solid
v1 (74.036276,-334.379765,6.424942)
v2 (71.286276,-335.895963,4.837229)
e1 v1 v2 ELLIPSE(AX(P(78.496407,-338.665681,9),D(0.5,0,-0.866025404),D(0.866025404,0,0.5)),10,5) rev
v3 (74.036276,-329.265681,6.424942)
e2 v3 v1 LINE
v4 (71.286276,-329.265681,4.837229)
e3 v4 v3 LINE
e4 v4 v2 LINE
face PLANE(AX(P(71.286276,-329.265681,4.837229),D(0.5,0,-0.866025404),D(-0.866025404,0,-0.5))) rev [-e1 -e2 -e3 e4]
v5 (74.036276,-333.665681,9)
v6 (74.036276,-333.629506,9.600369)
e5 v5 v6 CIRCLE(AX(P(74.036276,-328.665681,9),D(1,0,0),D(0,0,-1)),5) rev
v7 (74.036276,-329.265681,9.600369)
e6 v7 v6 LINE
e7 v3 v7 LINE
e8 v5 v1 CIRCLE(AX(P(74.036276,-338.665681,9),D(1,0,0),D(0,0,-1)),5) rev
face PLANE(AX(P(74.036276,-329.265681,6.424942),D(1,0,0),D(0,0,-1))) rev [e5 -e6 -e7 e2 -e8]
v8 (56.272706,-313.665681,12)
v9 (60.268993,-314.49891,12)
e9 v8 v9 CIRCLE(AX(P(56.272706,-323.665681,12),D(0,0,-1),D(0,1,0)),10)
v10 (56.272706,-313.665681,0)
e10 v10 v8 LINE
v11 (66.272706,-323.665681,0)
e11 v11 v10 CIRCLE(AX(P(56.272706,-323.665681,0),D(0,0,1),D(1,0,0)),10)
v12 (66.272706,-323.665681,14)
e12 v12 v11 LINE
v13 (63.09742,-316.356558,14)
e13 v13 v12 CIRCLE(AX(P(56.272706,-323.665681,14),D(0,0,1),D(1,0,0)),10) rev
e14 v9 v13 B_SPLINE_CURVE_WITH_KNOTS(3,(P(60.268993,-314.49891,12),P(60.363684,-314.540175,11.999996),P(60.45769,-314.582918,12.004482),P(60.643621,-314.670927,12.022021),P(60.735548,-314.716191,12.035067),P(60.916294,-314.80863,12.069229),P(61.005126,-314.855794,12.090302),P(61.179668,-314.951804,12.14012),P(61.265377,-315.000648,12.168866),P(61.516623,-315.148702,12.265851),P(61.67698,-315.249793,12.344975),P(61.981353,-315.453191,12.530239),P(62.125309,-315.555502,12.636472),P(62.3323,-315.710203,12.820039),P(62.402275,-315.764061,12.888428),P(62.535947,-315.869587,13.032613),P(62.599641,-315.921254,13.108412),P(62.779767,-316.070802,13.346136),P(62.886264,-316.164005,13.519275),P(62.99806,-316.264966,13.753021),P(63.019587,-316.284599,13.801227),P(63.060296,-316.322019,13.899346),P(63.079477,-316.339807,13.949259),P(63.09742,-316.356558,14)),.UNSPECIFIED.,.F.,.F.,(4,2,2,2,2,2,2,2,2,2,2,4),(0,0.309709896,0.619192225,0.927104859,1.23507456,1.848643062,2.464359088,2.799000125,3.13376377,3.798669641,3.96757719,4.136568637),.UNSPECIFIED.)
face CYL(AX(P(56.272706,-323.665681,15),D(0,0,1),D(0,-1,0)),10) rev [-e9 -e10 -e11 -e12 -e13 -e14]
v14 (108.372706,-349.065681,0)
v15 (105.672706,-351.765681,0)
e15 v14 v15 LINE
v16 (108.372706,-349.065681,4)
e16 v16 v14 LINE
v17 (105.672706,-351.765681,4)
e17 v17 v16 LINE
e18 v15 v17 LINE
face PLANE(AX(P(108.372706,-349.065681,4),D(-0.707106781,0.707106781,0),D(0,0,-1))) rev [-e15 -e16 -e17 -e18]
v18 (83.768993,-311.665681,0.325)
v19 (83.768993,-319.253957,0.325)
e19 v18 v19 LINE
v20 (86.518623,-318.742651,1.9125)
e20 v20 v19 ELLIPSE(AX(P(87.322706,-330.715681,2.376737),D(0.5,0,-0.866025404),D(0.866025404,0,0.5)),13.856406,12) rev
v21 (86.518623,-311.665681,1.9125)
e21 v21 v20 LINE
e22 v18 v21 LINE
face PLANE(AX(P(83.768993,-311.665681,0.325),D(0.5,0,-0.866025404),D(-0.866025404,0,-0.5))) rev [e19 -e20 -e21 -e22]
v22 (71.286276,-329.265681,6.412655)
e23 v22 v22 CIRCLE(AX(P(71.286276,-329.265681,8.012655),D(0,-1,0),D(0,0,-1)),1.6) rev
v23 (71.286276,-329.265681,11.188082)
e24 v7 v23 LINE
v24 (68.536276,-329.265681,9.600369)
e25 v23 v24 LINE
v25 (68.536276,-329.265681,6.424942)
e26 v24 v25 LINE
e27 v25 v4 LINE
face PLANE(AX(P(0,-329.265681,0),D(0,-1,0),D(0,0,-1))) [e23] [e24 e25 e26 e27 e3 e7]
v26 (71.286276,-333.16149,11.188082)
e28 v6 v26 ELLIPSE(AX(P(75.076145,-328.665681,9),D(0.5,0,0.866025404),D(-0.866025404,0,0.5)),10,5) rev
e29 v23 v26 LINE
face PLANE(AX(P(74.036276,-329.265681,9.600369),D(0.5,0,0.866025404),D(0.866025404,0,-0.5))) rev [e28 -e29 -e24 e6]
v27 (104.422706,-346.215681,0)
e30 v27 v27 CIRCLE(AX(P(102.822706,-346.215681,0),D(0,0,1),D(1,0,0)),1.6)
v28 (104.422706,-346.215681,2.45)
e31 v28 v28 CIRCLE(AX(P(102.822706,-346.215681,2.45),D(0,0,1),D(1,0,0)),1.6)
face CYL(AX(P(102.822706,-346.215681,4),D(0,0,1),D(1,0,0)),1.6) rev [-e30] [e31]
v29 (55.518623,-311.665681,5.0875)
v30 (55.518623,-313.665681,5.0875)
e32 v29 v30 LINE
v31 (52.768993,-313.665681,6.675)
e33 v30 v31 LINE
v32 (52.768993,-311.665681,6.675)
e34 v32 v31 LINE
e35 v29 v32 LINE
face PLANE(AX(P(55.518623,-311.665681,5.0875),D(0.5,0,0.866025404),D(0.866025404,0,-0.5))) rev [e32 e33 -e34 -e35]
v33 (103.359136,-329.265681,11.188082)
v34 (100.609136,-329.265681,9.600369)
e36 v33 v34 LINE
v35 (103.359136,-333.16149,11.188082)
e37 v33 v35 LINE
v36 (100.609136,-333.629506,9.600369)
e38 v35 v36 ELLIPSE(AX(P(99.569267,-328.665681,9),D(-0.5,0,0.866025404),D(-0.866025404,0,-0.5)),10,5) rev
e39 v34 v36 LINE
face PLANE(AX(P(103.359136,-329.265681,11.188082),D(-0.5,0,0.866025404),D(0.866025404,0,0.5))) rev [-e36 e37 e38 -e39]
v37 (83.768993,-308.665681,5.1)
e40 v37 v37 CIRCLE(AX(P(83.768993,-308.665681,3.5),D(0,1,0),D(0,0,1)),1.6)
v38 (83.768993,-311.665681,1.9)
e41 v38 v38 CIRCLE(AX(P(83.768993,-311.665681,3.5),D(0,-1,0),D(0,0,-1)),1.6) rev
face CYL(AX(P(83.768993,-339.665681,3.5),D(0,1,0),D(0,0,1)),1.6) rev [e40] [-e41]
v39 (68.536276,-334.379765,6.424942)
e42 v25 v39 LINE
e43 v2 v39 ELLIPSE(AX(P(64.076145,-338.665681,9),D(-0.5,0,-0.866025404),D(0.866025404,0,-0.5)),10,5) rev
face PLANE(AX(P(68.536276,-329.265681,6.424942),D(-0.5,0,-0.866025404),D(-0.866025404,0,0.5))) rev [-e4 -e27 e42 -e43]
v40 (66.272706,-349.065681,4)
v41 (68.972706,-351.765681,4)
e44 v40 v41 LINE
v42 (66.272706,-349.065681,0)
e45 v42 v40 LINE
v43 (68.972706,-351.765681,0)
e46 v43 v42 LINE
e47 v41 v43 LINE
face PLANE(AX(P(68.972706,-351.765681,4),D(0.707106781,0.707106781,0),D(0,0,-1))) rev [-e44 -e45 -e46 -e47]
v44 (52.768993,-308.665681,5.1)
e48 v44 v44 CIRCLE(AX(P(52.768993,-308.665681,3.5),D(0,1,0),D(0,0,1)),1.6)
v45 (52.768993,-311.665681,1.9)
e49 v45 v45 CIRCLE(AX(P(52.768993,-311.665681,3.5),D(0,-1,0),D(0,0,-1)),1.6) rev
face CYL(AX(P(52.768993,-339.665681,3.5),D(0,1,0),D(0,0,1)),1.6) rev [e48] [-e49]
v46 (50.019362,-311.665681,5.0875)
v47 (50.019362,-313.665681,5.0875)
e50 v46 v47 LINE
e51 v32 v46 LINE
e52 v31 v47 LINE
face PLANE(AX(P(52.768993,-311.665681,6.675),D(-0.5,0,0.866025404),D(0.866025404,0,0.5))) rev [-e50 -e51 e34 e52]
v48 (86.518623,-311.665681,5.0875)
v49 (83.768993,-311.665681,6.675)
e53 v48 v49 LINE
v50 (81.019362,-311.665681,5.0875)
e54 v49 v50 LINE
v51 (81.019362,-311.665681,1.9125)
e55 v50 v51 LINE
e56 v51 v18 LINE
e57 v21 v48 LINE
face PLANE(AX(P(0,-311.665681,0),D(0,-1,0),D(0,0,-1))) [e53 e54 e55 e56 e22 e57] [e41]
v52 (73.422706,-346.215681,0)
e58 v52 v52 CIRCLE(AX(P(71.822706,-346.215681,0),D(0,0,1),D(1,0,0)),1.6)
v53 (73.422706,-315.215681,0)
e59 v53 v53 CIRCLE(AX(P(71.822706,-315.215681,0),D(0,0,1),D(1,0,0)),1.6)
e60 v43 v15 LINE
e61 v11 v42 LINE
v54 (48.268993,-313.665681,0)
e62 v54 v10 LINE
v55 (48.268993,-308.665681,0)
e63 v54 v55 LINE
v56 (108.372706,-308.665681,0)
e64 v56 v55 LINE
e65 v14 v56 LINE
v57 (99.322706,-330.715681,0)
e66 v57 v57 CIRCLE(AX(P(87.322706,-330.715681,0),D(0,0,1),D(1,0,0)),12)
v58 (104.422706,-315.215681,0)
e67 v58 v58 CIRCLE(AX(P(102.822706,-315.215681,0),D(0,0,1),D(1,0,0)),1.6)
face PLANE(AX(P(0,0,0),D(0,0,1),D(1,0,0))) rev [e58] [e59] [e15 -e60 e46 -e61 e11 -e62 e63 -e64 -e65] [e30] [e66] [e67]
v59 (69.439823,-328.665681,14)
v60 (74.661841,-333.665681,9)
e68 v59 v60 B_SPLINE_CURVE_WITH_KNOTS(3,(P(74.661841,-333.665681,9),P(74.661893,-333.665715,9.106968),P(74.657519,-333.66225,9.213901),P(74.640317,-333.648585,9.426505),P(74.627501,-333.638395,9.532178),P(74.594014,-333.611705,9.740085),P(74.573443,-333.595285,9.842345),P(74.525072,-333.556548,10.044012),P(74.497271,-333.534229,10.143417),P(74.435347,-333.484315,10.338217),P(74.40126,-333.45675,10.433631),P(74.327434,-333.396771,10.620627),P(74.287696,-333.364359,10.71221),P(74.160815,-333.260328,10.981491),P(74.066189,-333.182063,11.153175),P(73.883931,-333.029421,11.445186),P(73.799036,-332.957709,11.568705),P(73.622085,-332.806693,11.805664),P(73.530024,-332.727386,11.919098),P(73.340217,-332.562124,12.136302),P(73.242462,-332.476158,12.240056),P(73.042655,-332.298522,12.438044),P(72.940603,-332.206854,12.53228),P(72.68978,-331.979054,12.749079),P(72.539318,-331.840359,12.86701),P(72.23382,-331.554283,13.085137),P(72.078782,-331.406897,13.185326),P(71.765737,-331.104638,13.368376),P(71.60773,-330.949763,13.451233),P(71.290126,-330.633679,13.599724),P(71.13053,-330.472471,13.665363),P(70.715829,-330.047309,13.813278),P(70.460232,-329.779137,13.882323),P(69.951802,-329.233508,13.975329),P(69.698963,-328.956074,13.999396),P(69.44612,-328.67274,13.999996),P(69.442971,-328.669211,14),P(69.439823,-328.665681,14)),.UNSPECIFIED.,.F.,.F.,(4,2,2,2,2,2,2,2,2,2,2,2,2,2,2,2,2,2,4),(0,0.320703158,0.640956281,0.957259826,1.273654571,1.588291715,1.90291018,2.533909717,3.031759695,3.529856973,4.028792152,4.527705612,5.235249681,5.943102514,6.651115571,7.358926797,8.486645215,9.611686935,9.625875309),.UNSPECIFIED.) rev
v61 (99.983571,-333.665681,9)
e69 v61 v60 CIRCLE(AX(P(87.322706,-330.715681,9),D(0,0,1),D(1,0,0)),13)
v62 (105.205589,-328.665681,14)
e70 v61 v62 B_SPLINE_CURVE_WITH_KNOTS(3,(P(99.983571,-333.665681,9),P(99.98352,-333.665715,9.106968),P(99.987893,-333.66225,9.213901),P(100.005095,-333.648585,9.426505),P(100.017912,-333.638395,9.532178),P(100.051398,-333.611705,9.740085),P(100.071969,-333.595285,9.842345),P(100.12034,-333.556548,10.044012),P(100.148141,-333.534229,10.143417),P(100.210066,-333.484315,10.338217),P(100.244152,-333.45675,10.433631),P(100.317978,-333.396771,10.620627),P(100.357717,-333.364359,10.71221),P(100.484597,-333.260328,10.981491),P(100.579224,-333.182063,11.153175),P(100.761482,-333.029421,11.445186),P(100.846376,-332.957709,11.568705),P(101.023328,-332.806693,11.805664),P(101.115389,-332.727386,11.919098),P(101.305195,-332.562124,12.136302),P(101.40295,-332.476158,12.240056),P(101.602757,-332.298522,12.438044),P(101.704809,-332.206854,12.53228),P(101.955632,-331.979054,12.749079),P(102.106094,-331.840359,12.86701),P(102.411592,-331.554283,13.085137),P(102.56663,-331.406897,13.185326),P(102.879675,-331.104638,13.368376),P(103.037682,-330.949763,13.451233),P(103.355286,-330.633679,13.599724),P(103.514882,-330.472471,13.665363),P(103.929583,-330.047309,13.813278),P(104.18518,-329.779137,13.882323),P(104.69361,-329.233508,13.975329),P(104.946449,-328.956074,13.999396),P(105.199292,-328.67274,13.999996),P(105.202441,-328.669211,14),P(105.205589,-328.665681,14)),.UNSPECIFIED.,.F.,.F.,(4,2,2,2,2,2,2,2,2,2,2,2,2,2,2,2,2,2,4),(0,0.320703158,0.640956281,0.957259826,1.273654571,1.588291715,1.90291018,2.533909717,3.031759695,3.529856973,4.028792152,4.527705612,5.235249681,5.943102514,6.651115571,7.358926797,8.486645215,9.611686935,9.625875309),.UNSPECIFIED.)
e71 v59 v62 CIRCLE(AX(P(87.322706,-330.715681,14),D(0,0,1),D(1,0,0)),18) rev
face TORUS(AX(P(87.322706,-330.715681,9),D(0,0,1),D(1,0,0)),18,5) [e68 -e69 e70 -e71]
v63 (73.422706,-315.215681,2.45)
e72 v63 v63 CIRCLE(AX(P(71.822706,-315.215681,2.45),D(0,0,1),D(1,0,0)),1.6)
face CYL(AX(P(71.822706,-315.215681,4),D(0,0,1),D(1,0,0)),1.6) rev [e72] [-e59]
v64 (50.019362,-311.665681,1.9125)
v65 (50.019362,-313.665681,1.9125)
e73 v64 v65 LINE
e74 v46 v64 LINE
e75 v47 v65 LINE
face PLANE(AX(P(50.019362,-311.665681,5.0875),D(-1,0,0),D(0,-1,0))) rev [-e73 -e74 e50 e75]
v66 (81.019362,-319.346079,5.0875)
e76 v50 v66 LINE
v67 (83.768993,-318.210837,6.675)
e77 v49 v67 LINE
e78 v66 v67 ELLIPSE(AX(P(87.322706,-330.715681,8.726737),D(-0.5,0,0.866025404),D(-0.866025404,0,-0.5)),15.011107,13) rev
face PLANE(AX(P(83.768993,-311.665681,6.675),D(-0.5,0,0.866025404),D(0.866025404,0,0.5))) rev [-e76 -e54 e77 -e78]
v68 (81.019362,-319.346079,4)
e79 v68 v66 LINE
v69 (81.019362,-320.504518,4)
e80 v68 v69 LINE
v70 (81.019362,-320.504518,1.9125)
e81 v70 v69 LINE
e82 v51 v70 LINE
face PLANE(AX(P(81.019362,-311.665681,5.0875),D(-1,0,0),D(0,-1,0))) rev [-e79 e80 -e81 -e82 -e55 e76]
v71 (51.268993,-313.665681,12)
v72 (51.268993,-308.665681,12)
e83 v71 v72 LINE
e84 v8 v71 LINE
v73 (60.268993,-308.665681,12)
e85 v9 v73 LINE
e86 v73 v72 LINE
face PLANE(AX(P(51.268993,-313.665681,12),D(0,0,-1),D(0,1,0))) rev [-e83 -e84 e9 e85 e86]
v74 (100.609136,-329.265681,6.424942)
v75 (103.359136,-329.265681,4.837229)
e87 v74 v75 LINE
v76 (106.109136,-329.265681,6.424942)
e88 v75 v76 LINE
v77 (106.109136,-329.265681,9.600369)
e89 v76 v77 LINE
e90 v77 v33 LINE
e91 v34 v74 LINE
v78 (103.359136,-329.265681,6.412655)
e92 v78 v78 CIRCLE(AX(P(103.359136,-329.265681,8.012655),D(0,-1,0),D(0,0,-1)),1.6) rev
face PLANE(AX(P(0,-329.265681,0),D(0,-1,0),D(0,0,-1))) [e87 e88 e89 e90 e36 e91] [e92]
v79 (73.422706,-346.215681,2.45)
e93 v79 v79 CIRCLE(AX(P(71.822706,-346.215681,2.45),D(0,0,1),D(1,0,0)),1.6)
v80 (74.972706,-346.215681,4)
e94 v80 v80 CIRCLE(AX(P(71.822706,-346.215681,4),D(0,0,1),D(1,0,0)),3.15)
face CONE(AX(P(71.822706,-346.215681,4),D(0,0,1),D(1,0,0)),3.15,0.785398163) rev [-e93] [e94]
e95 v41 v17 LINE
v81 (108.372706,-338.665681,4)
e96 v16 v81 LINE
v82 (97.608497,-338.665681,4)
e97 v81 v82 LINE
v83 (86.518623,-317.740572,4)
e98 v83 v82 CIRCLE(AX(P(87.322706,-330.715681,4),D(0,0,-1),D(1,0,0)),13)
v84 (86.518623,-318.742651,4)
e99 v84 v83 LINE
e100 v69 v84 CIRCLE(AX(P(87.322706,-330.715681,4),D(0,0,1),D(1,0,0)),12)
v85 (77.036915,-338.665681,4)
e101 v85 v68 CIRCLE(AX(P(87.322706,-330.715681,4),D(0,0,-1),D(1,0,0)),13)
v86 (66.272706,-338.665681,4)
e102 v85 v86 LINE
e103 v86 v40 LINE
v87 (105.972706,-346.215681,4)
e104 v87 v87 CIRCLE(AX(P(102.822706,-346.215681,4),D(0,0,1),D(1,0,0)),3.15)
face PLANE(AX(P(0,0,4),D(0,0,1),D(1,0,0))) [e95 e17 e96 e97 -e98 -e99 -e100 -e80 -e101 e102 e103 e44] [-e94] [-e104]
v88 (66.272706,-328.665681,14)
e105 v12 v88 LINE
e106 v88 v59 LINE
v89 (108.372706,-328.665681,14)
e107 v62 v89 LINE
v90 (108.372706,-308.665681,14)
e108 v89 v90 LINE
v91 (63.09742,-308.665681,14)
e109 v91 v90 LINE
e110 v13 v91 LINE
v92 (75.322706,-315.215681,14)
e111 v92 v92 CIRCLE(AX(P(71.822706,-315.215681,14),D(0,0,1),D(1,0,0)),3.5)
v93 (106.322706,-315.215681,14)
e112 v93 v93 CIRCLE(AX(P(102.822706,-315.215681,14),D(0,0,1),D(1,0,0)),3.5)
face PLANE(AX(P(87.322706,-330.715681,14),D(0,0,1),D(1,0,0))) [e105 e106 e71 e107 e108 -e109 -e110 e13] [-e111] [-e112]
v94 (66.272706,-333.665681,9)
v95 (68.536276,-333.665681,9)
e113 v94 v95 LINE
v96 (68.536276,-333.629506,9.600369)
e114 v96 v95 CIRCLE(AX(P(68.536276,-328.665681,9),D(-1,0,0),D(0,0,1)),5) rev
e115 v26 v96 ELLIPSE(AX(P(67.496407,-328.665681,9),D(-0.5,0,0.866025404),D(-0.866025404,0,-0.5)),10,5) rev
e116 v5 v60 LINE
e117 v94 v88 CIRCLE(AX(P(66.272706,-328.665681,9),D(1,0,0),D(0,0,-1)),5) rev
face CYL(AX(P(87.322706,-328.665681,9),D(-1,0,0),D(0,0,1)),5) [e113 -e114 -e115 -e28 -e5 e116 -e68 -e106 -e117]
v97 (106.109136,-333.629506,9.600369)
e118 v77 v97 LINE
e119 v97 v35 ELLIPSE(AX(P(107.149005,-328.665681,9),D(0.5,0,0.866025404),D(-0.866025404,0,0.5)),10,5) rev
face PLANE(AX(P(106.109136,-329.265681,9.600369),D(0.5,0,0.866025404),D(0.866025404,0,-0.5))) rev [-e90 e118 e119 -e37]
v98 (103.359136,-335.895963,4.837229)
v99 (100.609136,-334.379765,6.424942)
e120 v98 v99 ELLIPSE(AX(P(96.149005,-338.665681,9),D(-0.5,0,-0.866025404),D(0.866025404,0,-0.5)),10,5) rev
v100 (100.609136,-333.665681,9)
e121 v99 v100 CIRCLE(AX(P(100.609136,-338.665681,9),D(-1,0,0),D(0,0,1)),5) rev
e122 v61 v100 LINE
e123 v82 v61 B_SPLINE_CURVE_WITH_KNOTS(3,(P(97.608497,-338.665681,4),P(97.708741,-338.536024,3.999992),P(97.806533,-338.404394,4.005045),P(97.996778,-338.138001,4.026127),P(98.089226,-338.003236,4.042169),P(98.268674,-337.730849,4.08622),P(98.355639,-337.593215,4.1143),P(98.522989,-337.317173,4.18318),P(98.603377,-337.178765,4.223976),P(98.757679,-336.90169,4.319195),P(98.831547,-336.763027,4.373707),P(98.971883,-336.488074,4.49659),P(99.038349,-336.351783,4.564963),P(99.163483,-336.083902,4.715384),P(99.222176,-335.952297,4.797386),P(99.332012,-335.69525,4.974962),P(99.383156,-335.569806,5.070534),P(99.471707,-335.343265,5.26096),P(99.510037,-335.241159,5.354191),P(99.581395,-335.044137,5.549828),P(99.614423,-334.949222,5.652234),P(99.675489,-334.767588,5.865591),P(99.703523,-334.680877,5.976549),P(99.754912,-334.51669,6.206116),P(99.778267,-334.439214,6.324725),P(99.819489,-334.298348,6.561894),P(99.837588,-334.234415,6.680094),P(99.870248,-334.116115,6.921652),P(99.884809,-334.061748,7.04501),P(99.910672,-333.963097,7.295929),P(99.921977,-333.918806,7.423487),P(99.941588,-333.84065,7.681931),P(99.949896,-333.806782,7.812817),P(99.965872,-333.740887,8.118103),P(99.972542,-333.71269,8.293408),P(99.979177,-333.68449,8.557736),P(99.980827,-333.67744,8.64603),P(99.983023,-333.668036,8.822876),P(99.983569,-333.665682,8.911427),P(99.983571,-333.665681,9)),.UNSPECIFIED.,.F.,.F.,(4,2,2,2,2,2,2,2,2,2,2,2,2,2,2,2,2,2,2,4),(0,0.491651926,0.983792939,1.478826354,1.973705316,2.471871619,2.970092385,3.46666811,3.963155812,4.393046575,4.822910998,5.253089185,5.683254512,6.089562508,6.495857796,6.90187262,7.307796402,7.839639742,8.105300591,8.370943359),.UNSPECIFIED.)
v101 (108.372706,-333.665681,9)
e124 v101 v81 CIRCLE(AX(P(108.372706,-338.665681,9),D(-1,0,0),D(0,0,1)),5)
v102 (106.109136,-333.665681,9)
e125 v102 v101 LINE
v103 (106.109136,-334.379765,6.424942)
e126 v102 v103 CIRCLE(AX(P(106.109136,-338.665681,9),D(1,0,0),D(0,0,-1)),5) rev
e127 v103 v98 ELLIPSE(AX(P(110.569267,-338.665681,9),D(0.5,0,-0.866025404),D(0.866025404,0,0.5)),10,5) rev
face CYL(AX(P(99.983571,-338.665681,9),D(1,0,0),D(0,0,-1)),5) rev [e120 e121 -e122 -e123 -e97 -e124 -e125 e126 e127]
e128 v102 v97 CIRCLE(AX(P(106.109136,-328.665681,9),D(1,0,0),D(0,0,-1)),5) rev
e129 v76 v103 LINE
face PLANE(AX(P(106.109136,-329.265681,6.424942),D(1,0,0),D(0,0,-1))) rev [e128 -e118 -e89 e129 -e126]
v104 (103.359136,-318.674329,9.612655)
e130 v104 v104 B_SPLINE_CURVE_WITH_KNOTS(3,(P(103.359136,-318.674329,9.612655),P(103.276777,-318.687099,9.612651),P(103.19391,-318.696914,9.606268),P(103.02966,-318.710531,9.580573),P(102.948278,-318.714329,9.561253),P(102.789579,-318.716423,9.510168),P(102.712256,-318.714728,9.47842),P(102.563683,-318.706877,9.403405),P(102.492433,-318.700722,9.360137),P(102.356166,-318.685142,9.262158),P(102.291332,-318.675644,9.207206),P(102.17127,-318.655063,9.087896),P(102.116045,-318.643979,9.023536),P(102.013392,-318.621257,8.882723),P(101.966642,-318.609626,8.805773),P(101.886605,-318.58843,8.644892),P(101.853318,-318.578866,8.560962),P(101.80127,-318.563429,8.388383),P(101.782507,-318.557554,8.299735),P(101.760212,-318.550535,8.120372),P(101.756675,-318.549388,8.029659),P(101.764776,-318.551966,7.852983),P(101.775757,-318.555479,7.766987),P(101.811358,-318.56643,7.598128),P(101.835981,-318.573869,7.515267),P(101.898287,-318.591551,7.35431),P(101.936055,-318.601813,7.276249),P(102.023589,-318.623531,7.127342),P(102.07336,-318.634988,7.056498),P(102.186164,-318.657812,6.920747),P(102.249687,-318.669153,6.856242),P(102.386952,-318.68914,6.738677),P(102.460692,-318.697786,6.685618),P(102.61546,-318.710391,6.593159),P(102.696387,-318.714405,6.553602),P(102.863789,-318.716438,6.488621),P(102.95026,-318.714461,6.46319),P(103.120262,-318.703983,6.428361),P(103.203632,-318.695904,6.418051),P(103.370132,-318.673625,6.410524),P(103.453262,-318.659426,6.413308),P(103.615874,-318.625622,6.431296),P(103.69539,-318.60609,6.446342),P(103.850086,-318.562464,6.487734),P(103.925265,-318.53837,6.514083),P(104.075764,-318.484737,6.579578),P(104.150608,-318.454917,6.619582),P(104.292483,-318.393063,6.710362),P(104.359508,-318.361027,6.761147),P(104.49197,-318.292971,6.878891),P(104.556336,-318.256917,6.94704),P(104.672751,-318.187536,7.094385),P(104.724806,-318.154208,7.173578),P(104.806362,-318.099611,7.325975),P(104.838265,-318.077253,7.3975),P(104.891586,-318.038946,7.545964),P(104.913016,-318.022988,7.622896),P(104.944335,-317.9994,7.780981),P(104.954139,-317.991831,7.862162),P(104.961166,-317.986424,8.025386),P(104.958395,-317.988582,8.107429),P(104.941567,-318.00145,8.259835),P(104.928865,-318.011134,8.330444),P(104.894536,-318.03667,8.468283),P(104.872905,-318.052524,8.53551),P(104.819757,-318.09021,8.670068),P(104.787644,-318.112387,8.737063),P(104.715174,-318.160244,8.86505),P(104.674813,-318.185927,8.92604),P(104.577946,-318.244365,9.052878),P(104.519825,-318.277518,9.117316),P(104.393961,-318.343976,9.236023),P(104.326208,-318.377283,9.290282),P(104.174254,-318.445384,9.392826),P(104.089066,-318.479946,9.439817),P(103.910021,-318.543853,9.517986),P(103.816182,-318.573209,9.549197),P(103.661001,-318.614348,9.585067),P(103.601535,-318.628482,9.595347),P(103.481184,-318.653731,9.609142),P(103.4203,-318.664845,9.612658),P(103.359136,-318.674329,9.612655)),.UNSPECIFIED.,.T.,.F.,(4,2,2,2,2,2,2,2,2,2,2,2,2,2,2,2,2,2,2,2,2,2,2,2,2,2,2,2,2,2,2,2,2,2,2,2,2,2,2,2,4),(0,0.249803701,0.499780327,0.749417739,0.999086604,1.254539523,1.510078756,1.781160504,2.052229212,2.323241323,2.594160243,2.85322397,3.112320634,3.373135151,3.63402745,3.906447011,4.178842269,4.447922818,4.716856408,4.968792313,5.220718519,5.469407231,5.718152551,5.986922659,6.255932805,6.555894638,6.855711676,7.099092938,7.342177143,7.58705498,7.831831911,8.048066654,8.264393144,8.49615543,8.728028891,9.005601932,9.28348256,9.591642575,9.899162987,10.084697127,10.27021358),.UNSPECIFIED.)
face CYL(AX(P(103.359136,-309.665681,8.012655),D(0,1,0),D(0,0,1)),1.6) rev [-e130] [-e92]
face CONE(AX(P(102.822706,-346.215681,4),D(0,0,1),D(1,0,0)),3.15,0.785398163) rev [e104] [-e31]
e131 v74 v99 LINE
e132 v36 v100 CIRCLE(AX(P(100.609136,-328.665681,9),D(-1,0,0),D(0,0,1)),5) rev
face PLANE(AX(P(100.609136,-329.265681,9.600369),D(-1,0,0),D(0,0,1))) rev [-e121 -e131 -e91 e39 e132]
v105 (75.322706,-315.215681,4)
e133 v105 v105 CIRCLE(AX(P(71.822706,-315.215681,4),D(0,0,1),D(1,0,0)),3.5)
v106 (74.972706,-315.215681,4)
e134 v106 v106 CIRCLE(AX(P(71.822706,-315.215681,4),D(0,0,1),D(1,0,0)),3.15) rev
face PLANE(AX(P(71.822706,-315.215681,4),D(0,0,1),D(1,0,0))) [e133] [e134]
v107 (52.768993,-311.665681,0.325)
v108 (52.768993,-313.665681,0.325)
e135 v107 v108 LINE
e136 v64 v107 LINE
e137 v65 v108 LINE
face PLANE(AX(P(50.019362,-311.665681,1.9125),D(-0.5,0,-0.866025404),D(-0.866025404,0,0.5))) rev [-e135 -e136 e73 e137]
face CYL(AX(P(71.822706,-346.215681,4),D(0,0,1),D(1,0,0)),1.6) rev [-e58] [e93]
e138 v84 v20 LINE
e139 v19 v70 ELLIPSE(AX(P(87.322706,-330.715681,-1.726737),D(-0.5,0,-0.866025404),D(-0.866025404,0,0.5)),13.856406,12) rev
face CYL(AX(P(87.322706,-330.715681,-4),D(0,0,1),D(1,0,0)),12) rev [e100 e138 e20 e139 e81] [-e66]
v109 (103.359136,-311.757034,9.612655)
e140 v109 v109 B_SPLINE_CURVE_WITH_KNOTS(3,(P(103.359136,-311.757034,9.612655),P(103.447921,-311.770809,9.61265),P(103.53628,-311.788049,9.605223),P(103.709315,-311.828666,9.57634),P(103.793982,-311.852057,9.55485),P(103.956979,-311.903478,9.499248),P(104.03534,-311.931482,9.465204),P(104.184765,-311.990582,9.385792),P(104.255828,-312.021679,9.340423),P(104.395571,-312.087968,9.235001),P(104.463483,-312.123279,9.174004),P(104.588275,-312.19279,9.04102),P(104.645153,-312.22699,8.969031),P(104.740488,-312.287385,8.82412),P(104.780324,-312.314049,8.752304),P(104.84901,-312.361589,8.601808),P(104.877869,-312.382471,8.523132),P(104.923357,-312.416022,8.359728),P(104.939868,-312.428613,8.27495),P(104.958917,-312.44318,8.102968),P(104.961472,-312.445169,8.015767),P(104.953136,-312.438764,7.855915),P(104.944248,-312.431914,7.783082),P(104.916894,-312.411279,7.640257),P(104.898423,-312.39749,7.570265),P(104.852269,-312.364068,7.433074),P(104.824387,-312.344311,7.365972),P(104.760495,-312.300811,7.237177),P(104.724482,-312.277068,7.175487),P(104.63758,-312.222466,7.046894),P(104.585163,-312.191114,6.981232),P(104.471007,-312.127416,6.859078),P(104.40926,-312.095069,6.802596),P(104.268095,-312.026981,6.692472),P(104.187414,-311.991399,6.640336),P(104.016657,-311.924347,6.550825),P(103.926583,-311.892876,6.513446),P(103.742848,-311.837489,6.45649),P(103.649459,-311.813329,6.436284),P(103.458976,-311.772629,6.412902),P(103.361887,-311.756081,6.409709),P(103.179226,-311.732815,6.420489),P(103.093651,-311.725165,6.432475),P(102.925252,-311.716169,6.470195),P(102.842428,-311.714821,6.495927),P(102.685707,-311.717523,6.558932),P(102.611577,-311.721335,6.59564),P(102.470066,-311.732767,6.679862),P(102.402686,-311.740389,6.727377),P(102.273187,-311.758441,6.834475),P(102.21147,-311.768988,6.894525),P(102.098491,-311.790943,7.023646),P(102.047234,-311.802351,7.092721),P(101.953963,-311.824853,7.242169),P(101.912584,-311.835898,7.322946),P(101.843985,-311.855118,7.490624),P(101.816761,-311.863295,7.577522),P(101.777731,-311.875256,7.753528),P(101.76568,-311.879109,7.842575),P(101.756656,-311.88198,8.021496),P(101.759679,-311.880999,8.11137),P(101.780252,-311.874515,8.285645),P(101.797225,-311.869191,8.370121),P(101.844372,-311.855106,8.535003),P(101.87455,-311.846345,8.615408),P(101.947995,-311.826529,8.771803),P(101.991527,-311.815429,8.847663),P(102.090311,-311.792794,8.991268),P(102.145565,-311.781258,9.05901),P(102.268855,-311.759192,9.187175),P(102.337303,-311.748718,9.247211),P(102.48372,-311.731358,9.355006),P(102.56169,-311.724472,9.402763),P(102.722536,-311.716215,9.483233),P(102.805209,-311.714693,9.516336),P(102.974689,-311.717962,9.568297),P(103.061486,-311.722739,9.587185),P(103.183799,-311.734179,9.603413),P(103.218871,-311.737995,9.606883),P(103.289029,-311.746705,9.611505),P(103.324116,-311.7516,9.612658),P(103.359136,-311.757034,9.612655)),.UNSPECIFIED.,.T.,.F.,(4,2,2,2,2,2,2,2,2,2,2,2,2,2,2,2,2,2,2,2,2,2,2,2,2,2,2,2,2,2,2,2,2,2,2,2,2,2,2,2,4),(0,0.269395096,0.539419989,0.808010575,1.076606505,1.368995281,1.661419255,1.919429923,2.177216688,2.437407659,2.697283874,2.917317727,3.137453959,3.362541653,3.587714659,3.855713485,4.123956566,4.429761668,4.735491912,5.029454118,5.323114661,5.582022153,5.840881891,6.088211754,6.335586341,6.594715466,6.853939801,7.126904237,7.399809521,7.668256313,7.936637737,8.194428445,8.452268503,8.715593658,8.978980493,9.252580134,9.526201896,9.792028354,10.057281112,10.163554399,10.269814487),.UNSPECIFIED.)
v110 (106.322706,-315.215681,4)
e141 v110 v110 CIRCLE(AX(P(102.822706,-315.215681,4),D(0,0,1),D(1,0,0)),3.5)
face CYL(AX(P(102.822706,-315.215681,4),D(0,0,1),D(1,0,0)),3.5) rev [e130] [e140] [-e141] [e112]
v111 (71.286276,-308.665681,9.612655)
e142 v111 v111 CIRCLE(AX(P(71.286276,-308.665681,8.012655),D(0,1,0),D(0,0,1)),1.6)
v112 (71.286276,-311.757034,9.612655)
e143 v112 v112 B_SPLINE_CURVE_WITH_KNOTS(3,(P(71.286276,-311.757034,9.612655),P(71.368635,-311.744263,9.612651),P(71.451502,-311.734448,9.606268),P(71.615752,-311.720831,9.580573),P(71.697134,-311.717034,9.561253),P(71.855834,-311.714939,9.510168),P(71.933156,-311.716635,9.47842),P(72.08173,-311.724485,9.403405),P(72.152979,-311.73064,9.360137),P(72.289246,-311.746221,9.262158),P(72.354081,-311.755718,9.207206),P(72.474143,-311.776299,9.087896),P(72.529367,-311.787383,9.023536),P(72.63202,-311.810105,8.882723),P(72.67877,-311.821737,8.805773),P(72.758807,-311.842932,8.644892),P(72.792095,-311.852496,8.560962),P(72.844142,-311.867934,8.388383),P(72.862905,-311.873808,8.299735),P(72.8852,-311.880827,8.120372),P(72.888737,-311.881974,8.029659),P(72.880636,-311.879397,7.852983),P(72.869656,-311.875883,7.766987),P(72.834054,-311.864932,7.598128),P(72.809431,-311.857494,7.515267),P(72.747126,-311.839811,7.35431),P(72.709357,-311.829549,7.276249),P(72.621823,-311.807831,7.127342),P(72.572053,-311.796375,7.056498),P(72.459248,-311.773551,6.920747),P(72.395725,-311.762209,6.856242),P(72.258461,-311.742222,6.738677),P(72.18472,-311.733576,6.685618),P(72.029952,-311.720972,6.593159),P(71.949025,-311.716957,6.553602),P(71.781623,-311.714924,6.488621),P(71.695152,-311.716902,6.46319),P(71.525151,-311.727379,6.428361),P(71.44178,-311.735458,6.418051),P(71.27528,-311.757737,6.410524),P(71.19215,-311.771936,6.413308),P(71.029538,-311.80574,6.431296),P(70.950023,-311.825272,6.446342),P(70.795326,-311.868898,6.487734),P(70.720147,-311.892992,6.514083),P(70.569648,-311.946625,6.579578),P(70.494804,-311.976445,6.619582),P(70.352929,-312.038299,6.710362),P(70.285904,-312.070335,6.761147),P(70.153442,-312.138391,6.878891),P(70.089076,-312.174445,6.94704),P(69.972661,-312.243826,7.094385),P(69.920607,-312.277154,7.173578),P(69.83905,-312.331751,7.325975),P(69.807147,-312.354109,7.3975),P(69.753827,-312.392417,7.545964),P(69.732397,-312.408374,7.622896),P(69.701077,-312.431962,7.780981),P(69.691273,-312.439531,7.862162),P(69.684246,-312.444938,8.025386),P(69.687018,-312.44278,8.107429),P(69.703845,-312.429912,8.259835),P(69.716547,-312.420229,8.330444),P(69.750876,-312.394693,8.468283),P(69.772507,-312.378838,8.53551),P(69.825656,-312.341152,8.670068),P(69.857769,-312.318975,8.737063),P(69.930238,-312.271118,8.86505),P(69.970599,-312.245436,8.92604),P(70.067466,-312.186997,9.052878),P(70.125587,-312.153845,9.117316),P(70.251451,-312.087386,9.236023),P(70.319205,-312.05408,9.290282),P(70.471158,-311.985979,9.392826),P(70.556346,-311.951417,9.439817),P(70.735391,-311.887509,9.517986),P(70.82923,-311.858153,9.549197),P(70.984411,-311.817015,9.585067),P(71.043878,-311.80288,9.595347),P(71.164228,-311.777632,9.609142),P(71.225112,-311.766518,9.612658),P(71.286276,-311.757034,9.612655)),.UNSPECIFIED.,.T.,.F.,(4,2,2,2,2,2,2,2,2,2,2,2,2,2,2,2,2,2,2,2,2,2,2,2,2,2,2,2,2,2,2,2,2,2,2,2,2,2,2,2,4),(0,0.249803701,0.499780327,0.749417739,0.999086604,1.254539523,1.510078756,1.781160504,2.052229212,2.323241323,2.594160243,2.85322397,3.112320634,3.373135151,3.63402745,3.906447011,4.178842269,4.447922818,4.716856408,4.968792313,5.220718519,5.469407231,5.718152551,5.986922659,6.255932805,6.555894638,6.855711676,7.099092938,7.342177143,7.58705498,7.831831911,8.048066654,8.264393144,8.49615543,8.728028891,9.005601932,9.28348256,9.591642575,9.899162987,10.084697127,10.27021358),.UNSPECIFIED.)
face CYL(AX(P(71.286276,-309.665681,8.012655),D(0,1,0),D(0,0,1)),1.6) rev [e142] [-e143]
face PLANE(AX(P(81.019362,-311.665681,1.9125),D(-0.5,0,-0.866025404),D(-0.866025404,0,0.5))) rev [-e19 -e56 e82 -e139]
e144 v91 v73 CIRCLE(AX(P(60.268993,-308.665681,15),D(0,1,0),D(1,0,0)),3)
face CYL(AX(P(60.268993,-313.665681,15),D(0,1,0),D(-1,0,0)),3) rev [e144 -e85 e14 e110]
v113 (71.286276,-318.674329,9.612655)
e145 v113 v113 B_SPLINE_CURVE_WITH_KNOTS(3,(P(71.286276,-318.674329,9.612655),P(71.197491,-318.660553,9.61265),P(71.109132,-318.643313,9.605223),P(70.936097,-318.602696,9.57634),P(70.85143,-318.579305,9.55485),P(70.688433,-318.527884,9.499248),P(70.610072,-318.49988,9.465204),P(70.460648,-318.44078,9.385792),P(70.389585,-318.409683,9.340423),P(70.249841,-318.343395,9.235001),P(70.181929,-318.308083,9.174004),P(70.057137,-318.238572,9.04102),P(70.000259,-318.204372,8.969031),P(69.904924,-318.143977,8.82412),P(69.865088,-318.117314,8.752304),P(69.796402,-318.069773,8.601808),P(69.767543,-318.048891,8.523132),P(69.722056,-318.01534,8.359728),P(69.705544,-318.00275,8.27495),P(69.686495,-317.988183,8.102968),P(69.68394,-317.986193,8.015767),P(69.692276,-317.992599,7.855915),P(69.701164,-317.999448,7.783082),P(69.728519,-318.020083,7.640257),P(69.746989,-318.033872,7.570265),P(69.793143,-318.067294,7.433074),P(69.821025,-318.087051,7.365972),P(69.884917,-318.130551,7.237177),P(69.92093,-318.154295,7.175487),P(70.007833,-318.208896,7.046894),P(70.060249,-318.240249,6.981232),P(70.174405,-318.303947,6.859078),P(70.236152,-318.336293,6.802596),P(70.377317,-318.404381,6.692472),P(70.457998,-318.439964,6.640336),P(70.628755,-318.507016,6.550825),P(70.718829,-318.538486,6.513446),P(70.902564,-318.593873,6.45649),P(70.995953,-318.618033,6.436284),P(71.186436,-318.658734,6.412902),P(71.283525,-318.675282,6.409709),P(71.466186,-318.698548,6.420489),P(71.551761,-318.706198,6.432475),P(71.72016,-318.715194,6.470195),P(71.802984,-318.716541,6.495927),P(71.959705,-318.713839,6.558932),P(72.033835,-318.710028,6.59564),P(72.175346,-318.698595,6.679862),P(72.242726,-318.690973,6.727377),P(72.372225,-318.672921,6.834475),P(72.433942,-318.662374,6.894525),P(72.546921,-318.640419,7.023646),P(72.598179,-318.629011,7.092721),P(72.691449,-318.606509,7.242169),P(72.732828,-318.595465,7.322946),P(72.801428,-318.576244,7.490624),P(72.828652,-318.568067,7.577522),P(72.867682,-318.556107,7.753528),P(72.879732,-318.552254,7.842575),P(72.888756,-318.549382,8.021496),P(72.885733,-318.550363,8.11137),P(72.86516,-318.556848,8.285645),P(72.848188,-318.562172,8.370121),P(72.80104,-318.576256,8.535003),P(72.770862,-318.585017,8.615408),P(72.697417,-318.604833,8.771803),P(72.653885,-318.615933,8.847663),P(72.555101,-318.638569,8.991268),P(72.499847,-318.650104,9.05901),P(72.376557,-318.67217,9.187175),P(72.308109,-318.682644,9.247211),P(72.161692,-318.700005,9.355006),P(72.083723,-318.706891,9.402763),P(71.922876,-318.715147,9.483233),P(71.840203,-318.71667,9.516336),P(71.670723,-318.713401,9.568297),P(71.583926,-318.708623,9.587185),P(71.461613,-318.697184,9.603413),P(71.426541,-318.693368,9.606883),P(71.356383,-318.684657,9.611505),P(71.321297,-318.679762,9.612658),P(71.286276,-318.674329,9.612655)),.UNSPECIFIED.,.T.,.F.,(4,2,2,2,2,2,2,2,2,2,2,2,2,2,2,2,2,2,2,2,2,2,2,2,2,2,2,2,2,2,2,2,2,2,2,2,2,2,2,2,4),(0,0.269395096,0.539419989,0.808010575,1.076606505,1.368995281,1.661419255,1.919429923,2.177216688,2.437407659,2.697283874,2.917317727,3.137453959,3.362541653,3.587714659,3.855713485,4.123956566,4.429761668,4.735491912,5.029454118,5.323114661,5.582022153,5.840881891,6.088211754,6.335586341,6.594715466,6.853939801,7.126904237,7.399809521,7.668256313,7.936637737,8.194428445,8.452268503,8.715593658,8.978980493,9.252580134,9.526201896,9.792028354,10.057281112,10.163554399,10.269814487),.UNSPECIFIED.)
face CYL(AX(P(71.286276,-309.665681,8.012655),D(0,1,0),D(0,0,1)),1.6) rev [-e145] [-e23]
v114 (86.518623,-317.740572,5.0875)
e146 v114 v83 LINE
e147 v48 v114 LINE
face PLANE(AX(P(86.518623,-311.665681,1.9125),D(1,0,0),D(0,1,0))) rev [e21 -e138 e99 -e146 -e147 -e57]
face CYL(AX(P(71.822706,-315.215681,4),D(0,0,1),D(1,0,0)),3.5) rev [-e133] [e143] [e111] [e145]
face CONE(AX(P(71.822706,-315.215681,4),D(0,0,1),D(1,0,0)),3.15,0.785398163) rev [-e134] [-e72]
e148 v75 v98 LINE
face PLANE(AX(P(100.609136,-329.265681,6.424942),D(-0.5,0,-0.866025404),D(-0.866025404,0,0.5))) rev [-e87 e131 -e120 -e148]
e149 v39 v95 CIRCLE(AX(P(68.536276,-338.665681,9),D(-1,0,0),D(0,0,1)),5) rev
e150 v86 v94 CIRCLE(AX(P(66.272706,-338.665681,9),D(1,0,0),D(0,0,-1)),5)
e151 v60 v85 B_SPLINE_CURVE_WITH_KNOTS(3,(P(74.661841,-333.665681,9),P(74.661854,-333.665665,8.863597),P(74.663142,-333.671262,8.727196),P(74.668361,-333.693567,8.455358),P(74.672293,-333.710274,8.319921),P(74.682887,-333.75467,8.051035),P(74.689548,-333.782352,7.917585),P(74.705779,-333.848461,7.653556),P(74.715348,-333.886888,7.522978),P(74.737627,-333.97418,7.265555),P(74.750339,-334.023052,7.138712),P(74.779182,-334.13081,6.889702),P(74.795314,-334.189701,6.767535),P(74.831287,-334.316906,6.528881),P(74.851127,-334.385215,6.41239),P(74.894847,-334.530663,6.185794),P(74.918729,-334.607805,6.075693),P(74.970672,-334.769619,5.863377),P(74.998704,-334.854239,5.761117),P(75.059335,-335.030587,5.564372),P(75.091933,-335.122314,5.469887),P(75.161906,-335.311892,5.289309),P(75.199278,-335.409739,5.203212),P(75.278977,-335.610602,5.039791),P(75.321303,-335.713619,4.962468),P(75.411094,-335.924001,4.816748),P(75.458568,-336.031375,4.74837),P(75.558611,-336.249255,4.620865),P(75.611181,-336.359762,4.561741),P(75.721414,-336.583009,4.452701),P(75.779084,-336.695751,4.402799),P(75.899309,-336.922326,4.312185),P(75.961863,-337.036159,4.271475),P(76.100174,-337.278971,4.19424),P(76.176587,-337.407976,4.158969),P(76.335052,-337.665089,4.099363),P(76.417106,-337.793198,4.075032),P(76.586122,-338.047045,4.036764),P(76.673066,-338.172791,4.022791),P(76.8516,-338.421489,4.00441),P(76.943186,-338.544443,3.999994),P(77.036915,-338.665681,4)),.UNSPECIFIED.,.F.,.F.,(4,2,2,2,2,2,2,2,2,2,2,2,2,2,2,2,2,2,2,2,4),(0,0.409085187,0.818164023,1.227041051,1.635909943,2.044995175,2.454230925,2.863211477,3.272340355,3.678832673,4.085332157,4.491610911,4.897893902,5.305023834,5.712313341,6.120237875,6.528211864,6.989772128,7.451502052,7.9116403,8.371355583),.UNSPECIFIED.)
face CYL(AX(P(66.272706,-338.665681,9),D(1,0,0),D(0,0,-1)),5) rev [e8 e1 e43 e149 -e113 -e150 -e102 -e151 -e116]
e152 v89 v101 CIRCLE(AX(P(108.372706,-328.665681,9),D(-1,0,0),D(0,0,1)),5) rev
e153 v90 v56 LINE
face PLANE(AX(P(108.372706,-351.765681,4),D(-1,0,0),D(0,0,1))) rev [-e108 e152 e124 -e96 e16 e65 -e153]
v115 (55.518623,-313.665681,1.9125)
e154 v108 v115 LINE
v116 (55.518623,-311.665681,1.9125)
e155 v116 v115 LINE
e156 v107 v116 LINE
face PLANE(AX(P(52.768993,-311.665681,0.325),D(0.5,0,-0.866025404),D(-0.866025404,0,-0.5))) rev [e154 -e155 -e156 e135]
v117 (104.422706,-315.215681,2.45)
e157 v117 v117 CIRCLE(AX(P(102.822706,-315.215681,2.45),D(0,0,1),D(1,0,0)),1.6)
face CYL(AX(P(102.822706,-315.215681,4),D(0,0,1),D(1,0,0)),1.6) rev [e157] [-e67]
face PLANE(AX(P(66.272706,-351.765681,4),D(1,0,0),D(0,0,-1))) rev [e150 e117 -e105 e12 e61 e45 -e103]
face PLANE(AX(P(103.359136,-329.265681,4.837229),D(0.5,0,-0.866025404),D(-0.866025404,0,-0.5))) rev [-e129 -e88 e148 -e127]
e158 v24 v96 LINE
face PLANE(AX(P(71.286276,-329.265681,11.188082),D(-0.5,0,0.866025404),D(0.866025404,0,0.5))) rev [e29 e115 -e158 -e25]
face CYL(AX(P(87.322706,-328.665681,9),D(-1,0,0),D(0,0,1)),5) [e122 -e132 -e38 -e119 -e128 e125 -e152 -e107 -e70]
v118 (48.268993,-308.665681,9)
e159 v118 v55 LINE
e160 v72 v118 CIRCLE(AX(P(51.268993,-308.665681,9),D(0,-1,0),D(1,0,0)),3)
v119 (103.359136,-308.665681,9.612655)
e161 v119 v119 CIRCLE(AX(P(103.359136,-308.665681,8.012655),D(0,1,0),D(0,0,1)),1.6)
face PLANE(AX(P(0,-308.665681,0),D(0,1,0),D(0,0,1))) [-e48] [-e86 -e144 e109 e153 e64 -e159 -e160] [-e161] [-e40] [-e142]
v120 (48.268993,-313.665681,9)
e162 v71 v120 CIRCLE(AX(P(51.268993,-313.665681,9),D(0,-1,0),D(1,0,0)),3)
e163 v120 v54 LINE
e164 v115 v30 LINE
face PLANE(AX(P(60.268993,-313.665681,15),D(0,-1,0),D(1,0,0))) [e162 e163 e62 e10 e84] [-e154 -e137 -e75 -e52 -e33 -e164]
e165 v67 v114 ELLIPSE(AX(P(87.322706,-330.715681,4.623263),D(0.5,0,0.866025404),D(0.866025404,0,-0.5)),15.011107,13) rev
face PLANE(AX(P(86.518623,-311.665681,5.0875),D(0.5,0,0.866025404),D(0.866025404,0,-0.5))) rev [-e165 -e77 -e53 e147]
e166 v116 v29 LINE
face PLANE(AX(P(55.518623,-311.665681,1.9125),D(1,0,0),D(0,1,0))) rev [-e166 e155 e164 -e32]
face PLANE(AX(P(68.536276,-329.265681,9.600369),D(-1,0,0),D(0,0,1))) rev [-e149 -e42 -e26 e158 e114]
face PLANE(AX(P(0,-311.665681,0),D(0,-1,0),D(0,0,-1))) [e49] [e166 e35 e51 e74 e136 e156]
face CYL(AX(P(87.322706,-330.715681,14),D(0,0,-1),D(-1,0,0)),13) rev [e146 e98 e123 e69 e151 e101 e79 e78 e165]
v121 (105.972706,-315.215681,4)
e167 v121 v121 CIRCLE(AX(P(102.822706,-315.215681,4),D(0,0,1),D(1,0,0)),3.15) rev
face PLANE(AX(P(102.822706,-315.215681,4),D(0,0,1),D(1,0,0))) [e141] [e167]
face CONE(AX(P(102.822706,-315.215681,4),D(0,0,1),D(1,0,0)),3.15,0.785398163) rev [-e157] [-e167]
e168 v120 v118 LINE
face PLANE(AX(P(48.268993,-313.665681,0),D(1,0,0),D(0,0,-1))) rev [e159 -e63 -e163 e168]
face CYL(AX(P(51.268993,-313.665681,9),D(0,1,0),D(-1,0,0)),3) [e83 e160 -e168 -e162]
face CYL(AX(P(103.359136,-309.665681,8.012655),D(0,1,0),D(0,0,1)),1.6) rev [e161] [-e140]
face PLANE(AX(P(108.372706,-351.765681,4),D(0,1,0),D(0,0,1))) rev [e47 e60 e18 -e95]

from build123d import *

# Parameters (mm, degrees)
ESBO_O1_W                                            = 42.10000000000001
ESBO_O1_H                                            = 42.10000000000002
RESSALTO_EXTRUS_O1_DEPTH                             = 4
ESBO_O2_R                                            = 12.000000000000007
CORTE_EXTRUS_O1_DEPTH                                = 8
ESCAREADO_PARA_PARAFUSO_DE_M_QUINA_COM_C_D           = 3.2
ESCAREADO_PARA_PARAFUSO_DE_M_QUINA_COM_C_CSINK_D     = 6.3
ESCAREADO_PARA_PARAFUSO_DE_M_QUINA_COM_C_CSINK_ANGLE = 90
RESSALTO_EXTRUS_O2_DEPTH                             = 10
ESBO_O6_R                                            = 3.5000000000000075
CORTE_EXTRUS_O2_DEPTH                                = 10.000000000000002
FURO_COM_FOLGA_DE_M31_D                              = 3.2
FILETE1_R                                            = 5
CORTE_EXTRUS_O6_DEPTH                                = 22.500000000000007
CHANFRO1_SIZE                                        = 2.7
SKETCH2_W                                            = 42.10000000000001
SKETCH2_H                                            = 14.000000000000002
SKETCH2_R                                            = 1.5999999999999908
BOSS_EXTRUDE1_DEPTH                                  = 1
RESSALTO_EXTRUS_O3_DEPTH                             = 5
FILETE3_R                                            = 10
ESBO_O17_R                                           = 1.5999999999999908
ESBO_O17_R_2                                         = 1.599999999999991
CORTE_EXTRUS_O8_DEPTH                                = 31
CORTE_EXTRUS_O9_DEPTH                                = 8
CORTE_EXTRUS_O9_DEPTH_BACK                           = 2


with BuildPart() as part:
    # Esboço1 → Ressalto-extrusão1 (new body)
    with BuildSketch(Plane.XY):
        with Locations((87.32270610713223, -330.71568115646056)):
            Rectangle(ESBO_O1_W, ESBO_O1_H)
    extrude(amount=RESSALTO_EXTRUS_O1_DEPTH)

    # Esboço2 → Corte-extrusão1 (cut)
    with BuildSketch(Plane.XY.offset(4)):
        with Locations((87.32270610713225, -330.71568115646056)):
            Circle(ESBO_O2_R)
    extrude(amount=-CORTE_EXTRUS_O1_DEPTH, mode=Mode.SUBTRACT)

    # Escareado para parafuso de máquina com cabeça chata de M31 (through all)
    with Locations(Plane.XY.offset(4)):
        with Locations((102.822706107, -346.215681156), (102.822706107, -315.215681156), (71.822706107, -315.215681156), (71.822706107, -346.215681156)):
            CounterSinkHole(ESCAREADO_PARA_PARAFUSO_DE_M_QUINA_COM_C_D / 2, ESCAREADO_PARA_PARAFUSO_DE_M_QUINA_COM_C_CSINK_D / 2, counter_sink_angle=ESCAREADO_PARA_PARAFUSO_DE_M_QUINA_COM_C_CSINK_ANGLE)

    # Esboço5 → Ressalto-extrusão2 (add)
    with BuildSketch(Plane.XY.offset(4)):
        with BuildLine():
            Line((99.98357100649832, -333.66568115646055), (108.37270610713225, -333.66568115646055))
            Line((108.37270610713225, -333.66568115646055), (108.37270610713225, -309.66568115646055))
            Line((108.37270610713225, -309.66568115646055), (66.27270610713224, -309.66568115646055))
            Line((66.27270610713224, -309.66568115646055), (66.27270610713224, -333.66568115646055))
            Line((66.27270610713224, -333.66568115646055), (74.66184120776617, -333.66568115646055))
            ThreePointArc((74.66184120776617, -333.66568115646055), (87.32270610713225, -317.71568115646056), (99.98357100649832, -333.66568115646055))
        make_face()
    extrude(amount=RESSALTO_EXTRUS_O2_DEPTH)

    # Esboço6 → Corte-extrusão2 (cut)
    with BuildSketch(Plane.XY.offset(14)):
        with Locations((71.82270610713223, -315.21568115646056)):
            Circle(ESBO_O6_R)
        with Locations((102.82270610713226, -315.21568115646056)):
            Circle(ESBO_O6_R)
    extrude(amount=-CORTE_EXTRUS_O2_DEPTH, mode=Mode.SUBTRACT)

    # Furo com folga de M31 (through all)
    with Locations(Plane(origin=(0, -309.66568115646055, 0), x_dir=(1, 0, 0), z_dir=(0, 1, 0))):
        with Locations((103.359135837, -8.012655369), (71.286276377, -8.012655369)):
            Hole(FURO_COM_FOLGA_DE_M31_D / 2)

    # Filete1
    # the kernel refuses this fillet: 5 mm, written as the material it adds along each edge
    with BuildSketch(Plane(origin=(87.48357100649832, -333.66568115646055, 4), x_dir=(0, -1, 0), z_dir=(1, 0, 0))) as filete1_piece_1_section:
        with BuildLine():
            CenterArc((FILETE1_R, -FILETE1_R), FILETE1_R, 90, 90)
            Line((0, -FILETE1_R), (0, 0))
            Line((0, 0), (FILETE1_R, 0))
        make_face()
    filete1_piece_1 = extrude(amount=20.889135100633922, mode=Mode.PRIVATE)
    filete1_piece_1 = filete1_piece_1 - Plane(origin=(87.32270610713225, -330.71568115646056, 5.015859225762799), x_dir=(-0.9739126845666216, -0.22692307692307614, 0), z_dir=(0, 0, -1)) * Cylinder(12.999999999999995, 62, mode=Mode.PRIVATE)
    filete1_piece_1 = filete1_piece_1 - Plane(origin=(103.359135837, -334.8905504329836, 8.012655369), x_dir=(-1, 0, 0), z_dir=(0, -1, 0)) * Cylinder(1.6, 62, mode=Mode.PRIVATE)
    add(filete1_piece_1)
    with BuildSketch(Plane(origin=(66.27270610713224, -333.66568115646055, 4), x_dir=(0, -1, 0), z_dir=(1, 0, 0))) as filete1_piece_2_section:
        with BuildLine():
            CenterArc((FILETE1_R, -FILETE1_R), FILETE1_R, 90, 90)
            Line((0, -FILETE1_R), (0, 0))
            Line((0, 0), (FILETE1_R, 0))
        make_face()
    filete1_piece_2 = extrude(amount=20.889135100633936, mode=Mode.PRIVATE)
    filete1_piece_2 = filete1_piece_2 - Plane(origin=(87.32270610713225, -330.71568115646056, 5.01585849038902), x_dir=(-0.9739126845666216, -0.22692307692307614, 0), z_dir=(0, 0, -1)) * Cylinder(12.999999999999995, 62, mode=Mode.PRIVATE)
    filete1_piece_2 = filete1_piece_2 - Plane(origin=(71.286276377, -334.8905494522985, 8.012655369), x_dir=(-1, 0, 0), z_dir=(0, -1, 0)) * Cylinder(1.6, 62, mode=Mode.PRIVATE)
    add(filete1_piece_2)
    # the kernel refuses this fillet: 5 mm, written as the material it takes off along each edge
    with BuildSketch(Plane(origin=(87.32270610713225, -330.71568115646056, 14), x_dir=(-0.36935058707522056, -0.9292901289840487, 0), z_dir=(0.9292901289840487, -0.36935058707522056, 0))) as filete1_2_piece_1:
        with BuildLine():
            CenterArc((12.999999999999979 + FILETE1_R, FILETE1_R), FILETE1_R, 180, 90)
            Line((12.999999999999979 + FILETE1_R, 0), (12.999999999999979, 0))
            Line((12.999999999999979, 0), (12.999999999999984, FILETE1_R))
        make_face()
    revolve(axis=Axis((87.32270610713225, -330.71568115646056, 14), (0, 0, -1)), revolution_arc=316.648856226302, mode=Mode.SUBTRACT)
    with BuildSketch(Plane(origin=(87.48357100649832, -333.66568115646055, 14), x_dir=(0, 0, -1), z_dir=(1, 0, 0))) as filete1_2_piece_2:
        with BuildLine():
            CenterArc((FILETE1_R, FILETE1_R), FILETE1_R, 180, 90)
            Line((0, FILETE1_R), (0, 0))
            Line((0, 0), (FILETE1_R, 0))
        make_face()
    extrude(amount=33.38913510063392, mode=Mode.SUBTRACT)
    with BuildSketch(Plane(origin=(53.77270610713224, -333.66568115646055, 14), x_dir=(0, 1, 0), z_dir=(1, 0, 0))) as filete1_2_piece_3:
        with BuildLine():
            CenterArc((FILETE1_R, -FILETE1_R), FILETE1_R, 90, 90)
            Line((0, -FILETE1_R), (0, 0))
            Line((0, 0), (FILETE1_R, 0))
        make_face()
    extrude(amount=33.389135100633936, mode=Mode.SUBTRACT)

    # Esboço13 → Corte-extrusão6 (cut)
    with BuildSketch(Plane.XZ.offset(351.7656811564606)):
        Polygon((74.0362763774125, 9.60036860941331), (71.28627637741243, 11.188081849684735), (68.53627637741243, 9.600368609413174), (68.53627637741253, 6.424942128870199), (71.2862763774126, 4.837228888598795), (74.03627637741259, 6.424942128870374), align=None)
        Polygon((106.10913583685199, 9.600368609413255), (103.35913583685196, 11.188081849684727), (100.60913583685196, 9.600368609413236), (100.60913583685199, 6.424942128870286), (103.359135836852, 4.837228888598834), (106.109135836852, 6.424942128870341), align=None)
    extrude(amount=-CORTE_EXTRUS_O6_DEPTH, mode=Mode.SUBTRACT)

    # Chanfro1
    chanfro1_edges = [part.edges().sort_by_distance(p)[0] for p in [
        (66.27270610713224, -351.7656811564606, 2),
        (108.37270610713225, -351.7656811564606, 2),
    ]]
    chamfer(chanfro1_edges, length=CHANFRO1_SIZE)

    # Sketch2 → Boss-Extrude1 (add)
    with BuildSketch(Plane(origin=(0, -309.66568115646055, 0), x_dir=(1, 0, 0), z_dir=(0, 1, 0))):
        with Locations((87.32270610713223, -7.000000000000001)):
            Rectangle(SKETCH2_W, SKETCH2_H)
        with Locations(Location((71.2862763774125, -8.012655369141836, 0), (0, 0, 270))):
            Circle(SKETCH2_R, mode=Mode.SUBTRACT)
        with Locations(Location((103.35913583685199, -8.012655369141836, 0), (0, 0, 270))):
            Circle(SKETCH2_R, mode=Mode.SUBTRACT)
    extrude(amount=BOSS_EXTRUDE1_DEPTH)

    # Esboço16 → Ressalto-extrusão3 (add)
    with BuildSketch(Plane.XZ.offset(308.6656811564605)):
        with BuildLine():
            Line((66.27270610713242, 0), (48.26899269713348, -2.2e-16))
            Line((48.26899269713348, -2.2e-16), (48.26899269713353, 9.000000000000064))
            ThreePointArc((48.26899269713353, 9.000000000000064), (49.147672353573896, 11.121320343559699), (51.268992697133534, 12.000000000000052))
            Line((51.268992697133534, 12.000000000000052), (60.2689926971336, 12.000000000000052))
            ThreePointArc((60.2689926971336, 12.000000000000052), (62.00104350470245, 12.550510257216857), (63.097419821879775, 14))
            Line((63.097419821879775, 14), (66.27270610713242, 14))
            Line((66.27270610713242, 14), (66.27270610713242, 0))
        make_face()
    extrude(amount=RESSALTO_EXTRUS_O3_DEPTH)

    # Filete3
    filete3_edges = [part.edges().sort_by_distance(p)[0] for p in [
        (66.27270610713227, -313.66568115646055, 7),
    ]]
    fillet(filete3_edges, radius=FILETE3_R)

    # Esboço17 → Corte-extrusão8 (cut)
    with BuildSketch(Plane(origin=(0, -308.66568115646055, 0), x_dir=(1, 0, 0), z_dir=(0, 1, 0))):
        with Locations(Location((83.76899269713277, -3.499999999999323, 0), (0, 0, 270))):
            Circle(ESBO_O17_R)
        with Locations(Location((52.76899269713277, -3.499999999999323, 0), (0, 0, 270))):
            Circle(ESBO_O17_R_2)
    extrude(amount=-CORTE_EXTRUS_O8_DEPTH, mode=Mode.SUBTRACT)

    # Esboço18 → Corte-extrusão9 (cut, two sides: drawn at the far end of the back side and taken through both)
    with BuildSketch(Plane.XZ.offset(313.6656811564605).offset(-CORTE_EXTRUS_O9_DEPTH_BACK)):
        Polygon((52.76899269713293, 6.674999999999326), (50.01936204011733, 5.087499999999323), (50.01936204011733, 1.9124999999993277), (52.76899269713293, 0.3249999999993254), (55.51862335414852, 1.9124999999993266), (55.51862335414852, 5.087499999999325), align=None)
        Polygon((83.76899269713292, 6.6749999999993275), (81.01936204011734, 5.087499999999328), (81.01936204011734, 1.9124999999993286), (83.76899269713293, 0.3249999999993267), (86.5186233541485, 1.9124999999993186), (86.5186233541485, 5.087499999999332), align=None)
    extrude(amount=CORTE_EXTRUS_O9_DEPTH + CORTE_EXTRUS_O9_DEPTH_BACK, mode=Mode.SUBTRACT)


solid = part.part
